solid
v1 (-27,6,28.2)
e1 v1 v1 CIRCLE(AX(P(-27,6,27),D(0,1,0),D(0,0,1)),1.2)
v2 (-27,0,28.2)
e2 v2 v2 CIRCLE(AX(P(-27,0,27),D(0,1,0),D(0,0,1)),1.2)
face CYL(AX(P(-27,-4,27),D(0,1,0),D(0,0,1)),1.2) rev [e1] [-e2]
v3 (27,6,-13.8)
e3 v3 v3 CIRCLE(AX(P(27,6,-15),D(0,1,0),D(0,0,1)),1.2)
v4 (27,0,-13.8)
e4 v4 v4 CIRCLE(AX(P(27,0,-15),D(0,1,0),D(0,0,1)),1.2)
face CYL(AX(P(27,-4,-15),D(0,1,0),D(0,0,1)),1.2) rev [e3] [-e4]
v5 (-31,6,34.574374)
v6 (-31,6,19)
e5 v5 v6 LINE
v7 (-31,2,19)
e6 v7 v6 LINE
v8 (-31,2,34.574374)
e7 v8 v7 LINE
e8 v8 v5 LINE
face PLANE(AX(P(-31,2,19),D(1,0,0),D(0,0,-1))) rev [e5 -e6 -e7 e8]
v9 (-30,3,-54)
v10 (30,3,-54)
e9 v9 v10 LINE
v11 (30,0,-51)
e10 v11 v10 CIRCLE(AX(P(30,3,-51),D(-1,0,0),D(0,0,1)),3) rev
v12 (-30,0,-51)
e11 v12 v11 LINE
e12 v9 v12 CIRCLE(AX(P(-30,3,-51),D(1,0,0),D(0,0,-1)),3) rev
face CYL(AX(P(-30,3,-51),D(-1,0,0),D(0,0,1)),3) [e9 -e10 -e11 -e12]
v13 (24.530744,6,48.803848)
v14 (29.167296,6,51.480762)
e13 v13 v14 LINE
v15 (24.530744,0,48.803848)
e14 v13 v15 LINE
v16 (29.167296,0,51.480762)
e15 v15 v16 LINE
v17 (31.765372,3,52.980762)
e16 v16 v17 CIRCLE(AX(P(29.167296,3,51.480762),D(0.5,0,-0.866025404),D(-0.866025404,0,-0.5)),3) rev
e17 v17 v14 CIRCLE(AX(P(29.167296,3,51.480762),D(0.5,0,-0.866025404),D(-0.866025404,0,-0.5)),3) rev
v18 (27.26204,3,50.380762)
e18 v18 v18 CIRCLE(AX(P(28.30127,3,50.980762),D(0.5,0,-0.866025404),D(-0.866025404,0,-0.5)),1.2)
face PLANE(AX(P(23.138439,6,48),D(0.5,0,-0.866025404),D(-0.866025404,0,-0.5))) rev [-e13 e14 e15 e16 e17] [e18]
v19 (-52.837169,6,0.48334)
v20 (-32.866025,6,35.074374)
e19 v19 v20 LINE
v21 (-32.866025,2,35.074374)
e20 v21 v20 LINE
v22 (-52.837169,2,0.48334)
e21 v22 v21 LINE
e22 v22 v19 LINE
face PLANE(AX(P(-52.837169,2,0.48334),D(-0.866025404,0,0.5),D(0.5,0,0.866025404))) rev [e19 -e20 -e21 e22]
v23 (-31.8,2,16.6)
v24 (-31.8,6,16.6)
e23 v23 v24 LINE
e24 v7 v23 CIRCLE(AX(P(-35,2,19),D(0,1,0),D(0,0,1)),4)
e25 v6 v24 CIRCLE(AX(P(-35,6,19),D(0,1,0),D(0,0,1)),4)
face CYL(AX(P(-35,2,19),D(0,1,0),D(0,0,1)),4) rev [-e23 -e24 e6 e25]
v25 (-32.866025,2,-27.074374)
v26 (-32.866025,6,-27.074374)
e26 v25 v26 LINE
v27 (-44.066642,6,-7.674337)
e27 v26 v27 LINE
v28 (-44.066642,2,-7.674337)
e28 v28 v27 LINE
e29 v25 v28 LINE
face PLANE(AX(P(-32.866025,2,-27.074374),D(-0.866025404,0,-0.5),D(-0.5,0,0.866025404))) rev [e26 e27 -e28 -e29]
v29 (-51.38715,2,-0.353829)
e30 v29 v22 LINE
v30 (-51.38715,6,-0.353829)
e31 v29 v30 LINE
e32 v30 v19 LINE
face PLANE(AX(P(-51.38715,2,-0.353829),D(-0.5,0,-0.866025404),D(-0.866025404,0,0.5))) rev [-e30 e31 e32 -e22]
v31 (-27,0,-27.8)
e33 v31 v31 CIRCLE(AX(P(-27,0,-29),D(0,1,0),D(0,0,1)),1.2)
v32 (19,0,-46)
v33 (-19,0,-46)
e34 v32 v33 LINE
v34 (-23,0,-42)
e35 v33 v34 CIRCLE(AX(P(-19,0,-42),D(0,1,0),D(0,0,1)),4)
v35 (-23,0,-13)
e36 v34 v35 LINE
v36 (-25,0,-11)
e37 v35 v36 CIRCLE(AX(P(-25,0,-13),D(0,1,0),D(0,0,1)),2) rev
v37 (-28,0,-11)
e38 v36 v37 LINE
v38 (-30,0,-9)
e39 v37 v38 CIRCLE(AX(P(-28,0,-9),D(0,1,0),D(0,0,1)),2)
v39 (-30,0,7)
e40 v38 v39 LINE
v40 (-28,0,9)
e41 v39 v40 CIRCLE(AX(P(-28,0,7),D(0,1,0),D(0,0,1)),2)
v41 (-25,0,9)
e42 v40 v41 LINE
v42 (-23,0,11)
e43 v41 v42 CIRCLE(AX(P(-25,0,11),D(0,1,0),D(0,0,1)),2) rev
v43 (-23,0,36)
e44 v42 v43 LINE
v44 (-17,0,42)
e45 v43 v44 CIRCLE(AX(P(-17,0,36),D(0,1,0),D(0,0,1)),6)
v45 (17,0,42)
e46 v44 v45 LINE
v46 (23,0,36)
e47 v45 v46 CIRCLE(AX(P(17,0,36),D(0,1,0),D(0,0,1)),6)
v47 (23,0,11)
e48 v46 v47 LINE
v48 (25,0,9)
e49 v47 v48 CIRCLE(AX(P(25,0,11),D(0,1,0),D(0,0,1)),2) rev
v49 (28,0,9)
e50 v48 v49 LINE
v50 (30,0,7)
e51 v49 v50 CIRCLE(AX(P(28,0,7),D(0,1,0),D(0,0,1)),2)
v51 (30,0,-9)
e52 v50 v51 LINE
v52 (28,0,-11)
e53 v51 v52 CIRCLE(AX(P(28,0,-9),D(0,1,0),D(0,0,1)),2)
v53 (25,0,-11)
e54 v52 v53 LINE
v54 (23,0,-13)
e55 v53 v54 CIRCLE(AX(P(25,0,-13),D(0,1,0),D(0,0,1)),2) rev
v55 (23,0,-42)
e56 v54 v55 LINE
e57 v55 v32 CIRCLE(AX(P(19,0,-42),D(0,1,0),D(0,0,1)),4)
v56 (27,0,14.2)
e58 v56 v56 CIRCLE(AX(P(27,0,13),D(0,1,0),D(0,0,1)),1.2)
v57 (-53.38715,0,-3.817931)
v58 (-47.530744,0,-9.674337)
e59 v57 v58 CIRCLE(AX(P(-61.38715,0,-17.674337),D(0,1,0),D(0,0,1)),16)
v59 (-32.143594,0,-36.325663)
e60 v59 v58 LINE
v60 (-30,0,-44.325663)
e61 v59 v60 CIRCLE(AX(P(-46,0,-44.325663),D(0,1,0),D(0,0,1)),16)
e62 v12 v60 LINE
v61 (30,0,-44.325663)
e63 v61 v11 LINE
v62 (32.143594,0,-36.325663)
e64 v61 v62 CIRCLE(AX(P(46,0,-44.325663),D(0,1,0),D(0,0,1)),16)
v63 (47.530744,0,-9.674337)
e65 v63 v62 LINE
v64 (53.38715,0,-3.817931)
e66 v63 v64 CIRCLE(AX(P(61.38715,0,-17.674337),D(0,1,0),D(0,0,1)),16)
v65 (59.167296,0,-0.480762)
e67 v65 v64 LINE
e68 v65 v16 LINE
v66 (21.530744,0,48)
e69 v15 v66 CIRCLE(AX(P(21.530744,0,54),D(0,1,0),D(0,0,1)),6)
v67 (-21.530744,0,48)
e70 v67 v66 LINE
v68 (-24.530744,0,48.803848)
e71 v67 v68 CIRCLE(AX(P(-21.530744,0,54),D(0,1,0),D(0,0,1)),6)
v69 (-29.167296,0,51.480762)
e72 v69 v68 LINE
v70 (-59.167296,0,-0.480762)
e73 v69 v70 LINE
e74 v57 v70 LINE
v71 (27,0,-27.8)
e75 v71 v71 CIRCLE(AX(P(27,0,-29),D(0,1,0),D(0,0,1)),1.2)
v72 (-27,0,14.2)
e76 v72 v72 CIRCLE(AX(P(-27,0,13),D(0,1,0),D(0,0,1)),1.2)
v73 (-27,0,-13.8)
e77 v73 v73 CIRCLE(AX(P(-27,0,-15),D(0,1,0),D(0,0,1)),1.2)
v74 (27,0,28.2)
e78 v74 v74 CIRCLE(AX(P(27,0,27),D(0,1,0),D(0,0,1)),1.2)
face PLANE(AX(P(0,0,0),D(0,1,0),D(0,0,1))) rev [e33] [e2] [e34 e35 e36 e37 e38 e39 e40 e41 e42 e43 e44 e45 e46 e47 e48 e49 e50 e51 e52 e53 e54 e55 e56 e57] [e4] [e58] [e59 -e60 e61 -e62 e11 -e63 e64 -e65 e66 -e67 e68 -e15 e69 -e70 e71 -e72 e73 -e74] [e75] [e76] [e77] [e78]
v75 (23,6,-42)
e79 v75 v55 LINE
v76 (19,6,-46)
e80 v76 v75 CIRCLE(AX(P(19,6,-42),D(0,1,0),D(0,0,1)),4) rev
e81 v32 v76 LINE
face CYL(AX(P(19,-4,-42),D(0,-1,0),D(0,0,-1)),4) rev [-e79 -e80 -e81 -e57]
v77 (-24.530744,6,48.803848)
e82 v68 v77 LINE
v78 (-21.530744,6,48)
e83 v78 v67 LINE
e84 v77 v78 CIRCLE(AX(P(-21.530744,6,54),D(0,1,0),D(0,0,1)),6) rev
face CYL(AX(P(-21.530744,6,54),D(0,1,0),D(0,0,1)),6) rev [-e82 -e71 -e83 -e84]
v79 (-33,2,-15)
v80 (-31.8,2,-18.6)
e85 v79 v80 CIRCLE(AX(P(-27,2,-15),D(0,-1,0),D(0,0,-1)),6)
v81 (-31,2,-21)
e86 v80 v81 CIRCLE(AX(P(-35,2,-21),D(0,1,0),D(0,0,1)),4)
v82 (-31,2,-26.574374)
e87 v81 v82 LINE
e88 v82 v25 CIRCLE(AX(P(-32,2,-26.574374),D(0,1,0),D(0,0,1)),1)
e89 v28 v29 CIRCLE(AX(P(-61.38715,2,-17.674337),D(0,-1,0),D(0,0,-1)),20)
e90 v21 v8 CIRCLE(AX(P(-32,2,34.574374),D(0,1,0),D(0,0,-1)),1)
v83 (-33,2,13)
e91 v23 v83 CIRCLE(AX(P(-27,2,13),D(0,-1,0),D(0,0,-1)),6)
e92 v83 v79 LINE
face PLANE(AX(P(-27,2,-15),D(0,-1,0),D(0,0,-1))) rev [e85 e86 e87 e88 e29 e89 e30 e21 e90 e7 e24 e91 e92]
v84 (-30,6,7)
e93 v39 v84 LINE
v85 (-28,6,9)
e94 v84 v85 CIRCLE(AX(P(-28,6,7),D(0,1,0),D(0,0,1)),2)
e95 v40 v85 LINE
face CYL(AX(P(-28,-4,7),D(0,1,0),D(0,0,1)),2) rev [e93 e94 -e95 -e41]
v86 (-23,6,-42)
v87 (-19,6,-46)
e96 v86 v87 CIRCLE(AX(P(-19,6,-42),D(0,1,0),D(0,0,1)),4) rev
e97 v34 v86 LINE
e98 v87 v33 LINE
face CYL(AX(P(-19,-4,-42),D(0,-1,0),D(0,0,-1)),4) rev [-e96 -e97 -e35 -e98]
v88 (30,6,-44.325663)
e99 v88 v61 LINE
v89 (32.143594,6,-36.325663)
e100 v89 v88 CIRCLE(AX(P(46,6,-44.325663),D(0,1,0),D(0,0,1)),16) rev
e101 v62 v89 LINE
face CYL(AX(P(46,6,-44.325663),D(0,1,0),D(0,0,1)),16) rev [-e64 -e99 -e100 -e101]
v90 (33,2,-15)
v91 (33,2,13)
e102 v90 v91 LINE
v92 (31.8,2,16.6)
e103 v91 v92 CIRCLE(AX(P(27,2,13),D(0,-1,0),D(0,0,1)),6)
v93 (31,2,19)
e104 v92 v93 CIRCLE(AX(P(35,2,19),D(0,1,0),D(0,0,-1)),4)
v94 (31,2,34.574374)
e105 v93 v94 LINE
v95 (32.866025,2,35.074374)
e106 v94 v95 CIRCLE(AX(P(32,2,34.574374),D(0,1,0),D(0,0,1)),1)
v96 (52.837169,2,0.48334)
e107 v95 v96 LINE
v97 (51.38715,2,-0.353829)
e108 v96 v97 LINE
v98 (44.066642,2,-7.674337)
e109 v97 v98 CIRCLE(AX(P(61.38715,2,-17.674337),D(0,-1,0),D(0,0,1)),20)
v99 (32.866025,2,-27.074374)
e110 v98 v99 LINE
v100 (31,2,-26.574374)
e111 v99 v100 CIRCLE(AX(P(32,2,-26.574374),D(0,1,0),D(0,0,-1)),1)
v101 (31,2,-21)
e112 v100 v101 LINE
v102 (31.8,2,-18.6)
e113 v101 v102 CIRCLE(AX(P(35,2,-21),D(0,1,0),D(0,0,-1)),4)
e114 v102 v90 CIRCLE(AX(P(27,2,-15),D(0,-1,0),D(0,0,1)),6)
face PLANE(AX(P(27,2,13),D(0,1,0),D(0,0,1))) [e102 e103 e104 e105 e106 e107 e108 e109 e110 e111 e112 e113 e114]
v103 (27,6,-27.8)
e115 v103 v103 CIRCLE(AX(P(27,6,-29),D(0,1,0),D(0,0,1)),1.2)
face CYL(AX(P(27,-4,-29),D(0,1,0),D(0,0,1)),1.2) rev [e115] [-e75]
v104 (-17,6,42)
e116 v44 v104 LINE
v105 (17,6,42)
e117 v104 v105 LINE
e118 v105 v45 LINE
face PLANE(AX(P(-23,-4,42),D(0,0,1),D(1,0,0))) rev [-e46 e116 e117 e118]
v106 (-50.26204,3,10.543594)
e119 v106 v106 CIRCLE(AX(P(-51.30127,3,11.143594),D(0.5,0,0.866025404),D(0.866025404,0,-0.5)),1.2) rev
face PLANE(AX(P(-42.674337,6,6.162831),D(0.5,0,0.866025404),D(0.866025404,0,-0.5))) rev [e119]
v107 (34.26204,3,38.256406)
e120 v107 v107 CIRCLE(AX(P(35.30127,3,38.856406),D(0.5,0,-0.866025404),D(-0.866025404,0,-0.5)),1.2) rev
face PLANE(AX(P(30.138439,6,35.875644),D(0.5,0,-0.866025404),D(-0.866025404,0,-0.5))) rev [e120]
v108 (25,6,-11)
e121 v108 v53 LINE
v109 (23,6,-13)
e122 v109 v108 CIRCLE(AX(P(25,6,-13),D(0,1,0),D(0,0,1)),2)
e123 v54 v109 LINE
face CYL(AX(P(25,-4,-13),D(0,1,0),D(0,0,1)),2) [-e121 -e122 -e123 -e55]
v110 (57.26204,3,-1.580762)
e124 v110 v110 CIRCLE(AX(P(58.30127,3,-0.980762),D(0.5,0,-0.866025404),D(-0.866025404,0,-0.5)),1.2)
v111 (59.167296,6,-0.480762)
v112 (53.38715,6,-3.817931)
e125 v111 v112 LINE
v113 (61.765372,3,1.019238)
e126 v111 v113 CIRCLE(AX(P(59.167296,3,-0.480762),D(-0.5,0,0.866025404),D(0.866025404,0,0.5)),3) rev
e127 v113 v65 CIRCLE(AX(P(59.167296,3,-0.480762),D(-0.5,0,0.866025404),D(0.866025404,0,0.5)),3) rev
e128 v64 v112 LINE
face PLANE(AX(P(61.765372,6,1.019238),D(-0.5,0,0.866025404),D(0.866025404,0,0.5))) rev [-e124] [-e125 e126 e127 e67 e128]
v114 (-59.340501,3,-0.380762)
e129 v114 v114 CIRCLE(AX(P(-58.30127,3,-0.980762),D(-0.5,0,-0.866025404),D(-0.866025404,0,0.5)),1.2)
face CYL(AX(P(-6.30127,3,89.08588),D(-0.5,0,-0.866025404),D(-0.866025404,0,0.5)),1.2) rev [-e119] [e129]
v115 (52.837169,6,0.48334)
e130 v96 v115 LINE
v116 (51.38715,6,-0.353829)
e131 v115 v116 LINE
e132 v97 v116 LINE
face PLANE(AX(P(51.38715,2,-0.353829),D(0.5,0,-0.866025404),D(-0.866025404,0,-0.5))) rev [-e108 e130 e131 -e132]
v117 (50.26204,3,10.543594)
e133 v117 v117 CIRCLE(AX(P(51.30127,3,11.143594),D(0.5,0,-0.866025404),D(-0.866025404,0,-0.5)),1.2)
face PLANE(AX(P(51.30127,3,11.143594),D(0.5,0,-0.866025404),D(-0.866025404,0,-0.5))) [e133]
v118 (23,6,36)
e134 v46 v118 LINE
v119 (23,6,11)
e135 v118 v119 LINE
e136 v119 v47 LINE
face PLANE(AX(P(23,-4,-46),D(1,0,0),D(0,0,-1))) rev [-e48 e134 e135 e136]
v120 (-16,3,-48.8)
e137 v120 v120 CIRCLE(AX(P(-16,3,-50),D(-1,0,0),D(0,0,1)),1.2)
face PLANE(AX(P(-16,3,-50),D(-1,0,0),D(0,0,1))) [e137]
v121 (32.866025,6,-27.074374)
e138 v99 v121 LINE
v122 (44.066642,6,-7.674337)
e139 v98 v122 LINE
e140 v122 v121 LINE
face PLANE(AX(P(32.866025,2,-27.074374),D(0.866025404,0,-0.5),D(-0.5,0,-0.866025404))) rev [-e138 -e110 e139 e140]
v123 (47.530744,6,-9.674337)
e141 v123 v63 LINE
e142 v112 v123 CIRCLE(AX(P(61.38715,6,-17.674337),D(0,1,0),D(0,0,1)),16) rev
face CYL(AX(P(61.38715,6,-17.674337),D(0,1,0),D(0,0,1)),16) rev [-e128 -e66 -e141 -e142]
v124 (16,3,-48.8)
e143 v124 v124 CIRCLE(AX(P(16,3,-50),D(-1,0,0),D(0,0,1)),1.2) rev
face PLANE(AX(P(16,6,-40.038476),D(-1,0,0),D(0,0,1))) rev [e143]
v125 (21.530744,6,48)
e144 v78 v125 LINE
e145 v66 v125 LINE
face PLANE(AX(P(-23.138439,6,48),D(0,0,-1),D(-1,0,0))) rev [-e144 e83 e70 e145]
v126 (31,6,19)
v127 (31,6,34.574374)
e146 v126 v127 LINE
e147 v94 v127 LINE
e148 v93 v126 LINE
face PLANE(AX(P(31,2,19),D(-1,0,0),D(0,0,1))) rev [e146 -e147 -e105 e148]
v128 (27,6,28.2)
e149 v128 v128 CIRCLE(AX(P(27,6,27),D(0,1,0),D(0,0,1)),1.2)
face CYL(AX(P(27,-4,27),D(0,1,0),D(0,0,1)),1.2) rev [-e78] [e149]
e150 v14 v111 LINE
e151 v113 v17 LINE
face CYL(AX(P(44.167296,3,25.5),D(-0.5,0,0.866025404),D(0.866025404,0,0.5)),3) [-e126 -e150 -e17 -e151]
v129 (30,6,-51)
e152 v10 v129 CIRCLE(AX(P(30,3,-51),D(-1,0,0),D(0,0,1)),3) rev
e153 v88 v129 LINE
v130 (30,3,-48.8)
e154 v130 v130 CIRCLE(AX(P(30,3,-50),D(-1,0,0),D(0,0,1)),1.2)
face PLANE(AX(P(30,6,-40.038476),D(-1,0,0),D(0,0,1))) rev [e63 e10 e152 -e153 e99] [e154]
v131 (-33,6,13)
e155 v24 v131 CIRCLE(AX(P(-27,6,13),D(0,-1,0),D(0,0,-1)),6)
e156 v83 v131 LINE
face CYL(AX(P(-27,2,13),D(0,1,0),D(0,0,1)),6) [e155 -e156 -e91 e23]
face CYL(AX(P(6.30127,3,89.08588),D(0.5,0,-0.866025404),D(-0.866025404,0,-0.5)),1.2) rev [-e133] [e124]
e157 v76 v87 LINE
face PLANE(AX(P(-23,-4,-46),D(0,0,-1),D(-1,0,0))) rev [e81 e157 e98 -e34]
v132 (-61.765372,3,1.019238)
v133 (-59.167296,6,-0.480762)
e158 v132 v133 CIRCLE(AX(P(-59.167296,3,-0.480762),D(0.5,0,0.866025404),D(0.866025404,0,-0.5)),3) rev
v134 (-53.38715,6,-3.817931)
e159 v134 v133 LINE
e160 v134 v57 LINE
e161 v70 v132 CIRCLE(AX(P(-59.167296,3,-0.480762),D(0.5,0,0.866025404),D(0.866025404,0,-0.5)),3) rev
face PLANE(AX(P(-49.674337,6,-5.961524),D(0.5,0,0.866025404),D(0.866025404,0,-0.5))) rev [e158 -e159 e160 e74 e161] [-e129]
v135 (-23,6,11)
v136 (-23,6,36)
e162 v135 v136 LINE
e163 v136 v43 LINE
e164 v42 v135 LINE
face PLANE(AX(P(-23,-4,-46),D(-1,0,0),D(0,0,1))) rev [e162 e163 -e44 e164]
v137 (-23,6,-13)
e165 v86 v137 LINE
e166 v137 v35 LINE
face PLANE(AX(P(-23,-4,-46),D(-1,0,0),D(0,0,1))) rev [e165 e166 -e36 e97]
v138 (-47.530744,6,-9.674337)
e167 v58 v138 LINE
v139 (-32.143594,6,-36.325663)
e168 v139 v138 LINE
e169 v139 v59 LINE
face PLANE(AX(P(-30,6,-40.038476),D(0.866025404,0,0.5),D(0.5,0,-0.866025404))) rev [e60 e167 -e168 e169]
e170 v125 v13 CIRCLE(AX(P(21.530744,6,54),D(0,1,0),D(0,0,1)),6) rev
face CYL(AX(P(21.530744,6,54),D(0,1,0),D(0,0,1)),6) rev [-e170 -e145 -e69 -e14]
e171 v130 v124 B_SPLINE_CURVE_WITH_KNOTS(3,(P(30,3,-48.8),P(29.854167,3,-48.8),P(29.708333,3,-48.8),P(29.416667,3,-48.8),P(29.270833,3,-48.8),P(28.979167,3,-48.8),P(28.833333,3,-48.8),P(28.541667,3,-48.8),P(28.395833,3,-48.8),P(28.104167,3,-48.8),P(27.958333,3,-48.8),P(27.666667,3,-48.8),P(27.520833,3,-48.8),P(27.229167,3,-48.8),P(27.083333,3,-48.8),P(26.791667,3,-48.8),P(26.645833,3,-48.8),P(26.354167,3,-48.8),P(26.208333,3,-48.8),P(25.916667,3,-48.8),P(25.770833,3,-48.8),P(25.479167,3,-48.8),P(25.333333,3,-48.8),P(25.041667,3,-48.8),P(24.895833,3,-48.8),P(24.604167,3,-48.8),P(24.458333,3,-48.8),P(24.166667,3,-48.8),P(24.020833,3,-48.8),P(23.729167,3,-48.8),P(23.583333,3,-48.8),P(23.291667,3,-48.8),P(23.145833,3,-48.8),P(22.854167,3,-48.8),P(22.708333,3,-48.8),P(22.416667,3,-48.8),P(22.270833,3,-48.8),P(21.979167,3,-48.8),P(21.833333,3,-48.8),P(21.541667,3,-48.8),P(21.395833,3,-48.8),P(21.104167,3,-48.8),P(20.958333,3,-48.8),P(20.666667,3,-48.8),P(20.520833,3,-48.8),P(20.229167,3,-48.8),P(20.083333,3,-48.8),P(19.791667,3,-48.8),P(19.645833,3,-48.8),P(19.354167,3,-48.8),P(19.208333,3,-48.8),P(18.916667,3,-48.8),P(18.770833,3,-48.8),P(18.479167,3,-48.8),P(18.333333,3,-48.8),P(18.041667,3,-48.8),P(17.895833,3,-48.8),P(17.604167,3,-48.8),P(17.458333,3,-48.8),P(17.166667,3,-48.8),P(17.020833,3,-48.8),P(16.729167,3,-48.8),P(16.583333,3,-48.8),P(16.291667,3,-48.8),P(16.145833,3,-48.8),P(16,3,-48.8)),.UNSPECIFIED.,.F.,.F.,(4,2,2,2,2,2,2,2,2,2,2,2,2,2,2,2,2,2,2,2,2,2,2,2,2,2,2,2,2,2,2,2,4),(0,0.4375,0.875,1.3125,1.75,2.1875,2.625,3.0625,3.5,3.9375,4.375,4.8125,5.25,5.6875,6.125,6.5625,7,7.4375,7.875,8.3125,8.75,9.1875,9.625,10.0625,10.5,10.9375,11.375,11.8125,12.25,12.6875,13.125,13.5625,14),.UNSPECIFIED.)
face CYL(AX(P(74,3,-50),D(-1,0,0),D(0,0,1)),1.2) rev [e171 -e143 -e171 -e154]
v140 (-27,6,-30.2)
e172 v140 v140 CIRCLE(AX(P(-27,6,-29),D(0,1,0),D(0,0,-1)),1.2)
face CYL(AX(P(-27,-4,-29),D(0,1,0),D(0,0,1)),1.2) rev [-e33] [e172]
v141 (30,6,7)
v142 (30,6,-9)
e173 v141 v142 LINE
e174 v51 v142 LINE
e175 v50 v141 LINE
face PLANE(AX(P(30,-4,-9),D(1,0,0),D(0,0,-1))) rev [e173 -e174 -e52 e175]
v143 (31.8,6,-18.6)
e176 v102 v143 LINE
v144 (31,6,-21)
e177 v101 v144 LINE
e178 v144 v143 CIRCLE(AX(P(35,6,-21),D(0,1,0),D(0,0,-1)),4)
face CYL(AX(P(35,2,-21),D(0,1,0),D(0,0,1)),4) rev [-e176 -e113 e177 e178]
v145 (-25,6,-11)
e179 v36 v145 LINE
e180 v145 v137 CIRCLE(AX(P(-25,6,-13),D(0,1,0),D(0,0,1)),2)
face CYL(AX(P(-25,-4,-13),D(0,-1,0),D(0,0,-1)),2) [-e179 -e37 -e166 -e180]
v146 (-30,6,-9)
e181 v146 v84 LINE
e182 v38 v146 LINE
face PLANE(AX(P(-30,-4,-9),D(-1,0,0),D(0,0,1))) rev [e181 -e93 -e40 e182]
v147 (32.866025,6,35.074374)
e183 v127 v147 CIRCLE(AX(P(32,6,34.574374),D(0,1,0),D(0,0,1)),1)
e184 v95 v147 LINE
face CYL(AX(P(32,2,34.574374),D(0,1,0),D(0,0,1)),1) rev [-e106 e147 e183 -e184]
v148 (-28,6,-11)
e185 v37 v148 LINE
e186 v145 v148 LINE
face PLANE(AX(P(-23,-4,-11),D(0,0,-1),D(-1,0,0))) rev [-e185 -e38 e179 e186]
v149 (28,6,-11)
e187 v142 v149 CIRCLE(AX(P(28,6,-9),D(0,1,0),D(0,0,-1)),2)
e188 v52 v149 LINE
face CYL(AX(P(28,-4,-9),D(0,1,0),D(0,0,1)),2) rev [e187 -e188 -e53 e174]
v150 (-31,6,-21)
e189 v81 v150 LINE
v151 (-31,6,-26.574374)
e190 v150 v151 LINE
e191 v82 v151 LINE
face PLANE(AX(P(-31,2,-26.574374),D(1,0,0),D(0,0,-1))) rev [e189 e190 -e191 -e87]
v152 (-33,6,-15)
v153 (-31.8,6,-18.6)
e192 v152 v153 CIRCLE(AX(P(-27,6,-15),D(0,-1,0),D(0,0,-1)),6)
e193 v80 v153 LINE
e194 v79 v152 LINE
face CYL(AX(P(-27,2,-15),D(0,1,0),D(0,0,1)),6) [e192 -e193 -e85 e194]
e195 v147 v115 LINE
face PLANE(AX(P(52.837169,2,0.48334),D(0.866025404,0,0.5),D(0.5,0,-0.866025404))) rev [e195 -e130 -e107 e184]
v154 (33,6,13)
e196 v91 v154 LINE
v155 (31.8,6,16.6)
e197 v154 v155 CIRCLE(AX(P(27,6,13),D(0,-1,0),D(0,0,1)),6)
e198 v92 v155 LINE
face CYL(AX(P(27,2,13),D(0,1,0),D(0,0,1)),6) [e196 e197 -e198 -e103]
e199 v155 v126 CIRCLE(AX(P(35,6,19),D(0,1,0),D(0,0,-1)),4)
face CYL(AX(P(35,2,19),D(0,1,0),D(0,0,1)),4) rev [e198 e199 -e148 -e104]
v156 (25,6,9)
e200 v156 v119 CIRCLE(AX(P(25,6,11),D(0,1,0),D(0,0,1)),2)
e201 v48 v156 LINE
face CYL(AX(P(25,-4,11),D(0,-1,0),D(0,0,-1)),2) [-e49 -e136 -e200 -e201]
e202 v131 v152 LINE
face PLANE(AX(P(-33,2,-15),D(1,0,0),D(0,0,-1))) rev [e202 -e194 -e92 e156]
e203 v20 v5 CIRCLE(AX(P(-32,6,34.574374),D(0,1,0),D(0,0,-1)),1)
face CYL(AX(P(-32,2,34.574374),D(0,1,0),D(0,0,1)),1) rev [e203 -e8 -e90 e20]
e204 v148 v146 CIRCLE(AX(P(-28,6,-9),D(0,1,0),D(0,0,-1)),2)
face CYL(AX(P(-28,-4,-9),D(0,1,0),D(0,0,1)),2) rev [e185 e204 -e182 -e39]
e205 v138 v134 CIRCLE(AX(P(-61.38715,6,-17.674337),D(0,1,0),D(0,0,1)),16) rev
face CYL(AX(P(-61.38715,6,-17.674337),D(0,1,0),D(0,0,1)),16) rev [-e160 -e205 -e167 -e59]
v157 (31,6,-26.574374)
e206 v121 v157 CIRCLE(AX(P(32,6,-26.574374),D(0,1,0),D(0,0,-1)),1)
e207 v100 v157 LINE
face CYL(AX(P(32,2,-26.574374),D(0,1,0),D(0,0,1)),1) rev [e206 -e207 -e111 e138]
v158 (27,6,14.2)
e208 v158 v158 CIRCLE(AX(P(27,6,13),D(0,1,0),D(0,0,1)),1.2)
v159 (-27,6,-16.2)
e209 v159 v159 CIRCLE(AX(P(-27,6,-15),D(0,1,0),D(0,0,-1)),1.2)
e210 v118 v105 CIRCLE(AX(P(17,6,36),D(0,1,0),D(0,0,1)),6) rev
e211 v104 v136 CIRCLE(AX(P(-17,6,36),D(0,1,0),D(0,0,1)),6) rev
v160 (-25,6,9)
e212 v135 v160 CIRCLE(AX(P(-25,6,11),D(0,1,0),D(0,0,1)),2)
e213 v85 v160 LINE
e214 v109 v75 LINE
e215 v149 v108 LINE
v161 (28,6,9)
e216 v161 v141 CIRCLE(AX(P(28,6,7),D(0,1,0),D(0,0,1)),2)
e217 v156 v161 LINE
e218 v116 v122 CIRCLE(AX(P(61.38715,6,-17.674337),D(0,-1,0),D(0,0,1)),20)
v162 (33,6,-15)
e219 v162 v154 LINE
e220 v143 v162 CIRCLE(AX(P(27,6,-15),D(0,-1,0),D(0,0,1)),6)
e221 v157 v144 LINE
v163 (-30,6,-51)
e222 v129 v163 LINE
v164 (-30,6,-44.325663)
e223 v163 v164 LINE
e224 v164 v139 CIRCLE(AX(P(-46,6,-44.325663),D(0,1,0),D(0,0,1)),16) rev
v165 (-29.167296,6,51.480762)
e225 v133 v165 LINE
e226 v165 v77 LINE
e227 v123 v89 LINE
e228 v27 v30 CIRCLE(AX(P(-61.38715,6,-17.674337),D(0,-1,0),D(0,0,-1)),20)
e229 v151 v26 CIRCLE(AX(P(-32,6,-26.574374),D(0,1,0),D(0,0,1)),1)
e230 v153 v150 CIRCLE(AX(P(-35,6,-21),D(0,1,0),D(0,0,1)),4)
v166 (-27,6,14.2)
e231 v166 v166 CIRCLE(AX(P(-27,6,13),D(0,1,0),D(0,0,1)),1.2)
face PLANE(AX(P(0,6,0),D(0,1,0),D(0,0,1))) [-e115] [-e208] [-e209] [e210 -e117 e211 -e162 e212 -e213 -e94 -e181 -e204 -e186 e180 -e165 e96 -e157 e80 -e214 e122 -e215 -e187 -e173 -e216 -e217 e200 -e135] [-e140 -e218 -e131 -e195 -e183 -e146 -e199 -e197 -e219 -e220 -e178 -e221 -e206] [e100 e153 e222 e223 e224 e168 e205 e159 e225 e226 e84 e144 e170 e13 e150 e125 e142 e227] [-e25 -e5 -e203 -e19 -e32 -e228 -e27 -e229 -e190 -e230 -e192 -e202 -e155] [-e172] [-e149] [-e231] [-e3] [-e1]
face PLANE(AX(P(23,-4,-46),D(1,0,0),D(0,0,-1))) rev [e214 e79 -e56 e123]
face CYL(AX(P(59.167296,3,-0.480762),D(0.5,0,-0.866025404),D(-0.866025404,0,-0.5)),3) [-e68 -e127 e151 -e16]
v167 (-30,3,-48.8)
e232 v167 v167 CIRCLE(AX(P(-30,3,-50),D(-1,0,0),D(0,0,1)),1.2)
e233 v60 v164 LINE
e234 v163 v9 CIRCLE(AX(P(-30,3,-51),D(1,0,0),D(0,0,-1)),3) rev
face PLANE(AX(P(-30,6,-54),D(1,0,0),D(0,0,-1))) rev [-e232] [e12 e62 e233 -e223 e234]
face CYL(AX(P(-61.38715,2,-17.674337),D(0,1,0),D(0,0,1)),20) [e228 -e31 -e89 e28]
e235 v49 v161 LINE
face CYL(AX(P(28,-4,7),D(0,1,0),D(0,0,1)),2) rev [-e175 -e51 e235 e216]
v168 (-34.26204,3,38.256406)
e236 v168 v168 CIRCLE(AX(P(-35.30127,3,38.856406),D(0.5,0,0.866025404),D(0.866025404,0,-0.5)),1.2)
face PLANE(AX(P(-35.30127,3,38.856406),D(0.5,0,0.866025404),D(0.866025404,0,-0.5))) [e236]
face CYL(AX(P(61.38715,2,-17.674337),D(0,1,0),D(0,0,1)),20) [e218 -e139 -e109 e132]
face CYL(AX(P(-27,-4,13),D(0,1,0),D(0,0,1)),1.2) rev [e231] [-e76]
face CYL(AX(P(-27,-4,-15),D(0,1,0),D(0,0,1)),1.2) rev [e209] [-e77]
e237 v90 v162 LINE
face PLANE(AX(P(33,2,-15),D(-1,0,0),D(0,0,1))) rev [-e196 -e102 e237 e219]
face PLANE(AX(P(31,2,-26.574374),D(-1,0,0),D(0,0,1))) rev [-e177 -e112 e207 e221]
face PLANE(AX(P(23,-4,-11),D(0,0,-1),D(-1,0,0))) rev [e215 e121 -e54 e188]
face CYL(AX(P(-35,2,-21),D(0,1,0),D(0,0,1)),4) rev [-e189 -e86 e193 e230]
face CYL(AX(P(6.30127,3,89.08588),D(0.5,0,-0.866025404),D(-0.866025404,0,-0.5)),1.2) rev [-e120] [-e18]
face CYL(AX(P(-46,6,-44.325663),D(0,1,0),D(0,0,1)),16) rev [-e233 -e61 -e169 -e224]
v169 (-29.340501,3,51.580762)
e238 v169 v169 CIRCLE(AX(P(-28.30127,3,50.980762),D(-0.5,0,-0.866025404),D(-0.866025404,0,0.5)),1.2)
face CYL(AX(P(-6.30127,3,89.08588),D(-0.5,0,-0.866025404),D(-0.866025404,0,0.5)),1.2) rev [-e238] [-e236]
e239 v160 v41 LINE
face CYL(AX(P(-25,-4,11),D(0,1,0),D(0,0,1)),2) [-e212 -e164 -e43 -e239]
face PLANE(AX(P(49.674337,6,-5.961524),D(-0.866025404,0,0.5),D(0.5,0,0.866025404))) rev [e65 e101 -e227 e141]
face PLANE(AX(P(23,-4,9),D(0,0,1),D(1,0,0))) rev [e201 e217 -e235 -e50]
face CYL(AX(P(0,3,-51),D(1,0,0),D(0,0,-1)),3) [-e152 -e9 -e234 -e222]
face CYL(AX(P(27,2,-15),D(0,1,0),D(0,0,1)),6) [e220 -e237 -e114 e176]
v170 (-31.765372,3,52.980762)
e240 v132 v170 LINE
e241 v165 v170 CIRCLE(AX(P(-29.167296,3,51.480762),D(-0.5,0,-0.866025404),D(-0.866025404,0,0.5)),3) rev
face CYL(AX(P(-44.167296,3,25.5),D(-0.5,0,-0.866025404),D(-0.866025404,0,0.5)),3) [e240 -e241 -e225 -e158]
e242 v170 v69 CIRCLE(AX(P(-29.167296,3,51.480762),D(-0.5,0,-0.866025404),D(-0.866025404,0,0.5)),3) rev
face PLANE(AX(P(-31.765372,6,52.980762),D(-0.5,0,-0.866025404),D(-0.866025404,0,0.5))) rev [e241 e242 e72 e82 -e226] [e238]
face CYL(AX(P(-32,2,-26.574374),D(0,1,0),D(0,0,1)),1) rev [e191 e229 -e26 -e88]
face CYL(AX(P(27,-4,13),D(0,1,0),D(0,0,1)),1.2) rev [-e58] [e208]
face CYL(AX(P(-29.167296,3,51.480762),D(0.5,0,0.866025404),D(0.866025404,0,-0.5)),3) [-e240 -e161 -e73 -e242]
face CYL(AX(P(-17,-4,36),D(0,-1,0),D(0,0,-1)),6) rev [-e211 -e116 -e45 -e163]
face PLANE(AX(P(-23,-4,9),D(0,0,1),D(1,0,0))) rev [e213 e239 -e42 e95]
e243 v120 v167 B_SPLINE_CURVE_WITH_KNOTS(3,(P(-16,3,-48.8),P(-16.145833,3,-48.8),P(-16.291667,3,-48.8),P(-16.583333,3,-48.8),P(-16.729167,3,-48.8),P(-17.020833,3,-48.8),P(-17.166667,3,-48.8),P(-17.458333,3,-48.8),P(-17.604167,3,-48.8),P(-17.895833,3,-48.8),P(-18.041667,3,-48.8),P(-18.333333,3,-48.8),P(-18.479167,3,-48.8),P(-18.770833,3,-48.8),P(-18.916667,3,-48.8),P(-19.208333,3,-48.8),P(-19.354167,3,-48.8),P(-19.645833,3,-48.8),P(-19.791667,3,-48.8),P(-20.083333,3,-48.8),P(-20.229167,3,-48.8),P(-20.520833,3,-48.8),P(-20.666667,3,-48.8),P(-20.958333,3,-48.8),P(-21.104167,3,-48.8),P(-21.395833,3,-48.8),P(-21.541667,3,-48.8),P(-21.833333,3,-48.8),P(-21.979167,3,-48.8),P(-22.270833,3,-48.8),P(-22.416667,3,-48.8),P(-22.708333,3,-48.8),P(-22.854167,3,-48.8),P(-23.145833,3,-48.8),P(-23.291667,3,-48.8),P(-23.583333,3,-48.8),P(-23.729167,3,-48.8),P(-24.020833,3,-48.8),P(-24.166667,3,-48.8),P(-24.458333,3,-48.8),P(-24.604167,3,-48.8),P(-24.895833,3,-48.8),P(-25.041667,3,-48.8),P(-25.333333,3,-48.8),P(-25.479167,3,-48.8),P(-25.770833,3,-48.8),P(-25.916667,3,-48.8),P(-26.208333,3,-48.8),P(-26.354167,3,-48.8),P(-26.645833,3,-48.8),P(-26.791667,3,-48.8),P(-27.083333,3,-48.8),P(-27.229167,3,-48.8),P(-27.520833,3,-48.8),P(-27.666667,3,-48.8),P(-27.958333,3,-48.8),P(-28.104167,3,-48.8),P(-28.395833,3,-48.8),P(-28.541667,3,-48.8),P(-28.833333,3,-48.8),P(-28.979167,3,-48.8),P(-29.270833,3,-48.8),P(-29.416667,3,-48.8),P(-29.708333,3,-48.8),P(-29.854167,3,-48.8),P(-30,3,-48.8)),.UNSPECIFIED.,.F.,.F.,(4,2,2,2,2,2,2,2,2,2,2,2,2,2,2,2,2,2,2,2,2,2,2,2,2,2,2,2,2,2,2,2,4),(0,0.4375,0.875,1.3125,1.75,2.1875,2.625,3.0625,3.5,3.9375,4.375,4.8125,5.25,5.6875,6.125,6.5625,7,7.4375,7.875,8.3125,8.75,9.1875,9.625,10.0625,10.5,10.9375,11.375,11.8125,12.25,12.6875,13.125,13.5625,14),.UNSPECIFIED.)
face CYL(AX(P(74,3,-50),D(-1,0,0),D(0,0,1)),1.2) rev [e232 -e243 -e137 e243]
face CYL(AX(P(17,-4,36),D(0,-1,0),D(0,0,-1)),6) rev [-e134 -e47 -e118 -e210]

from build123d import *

# Parameters (mm, degrees)
BOSS_EXTRUDE1_DEPTH = 6
SKETCH6_R           = 1.2
CUT_EXTRUDE1_DEPTH  = 104
SKETCH4_R           = 1.2
CUT_EXTRUDE2_DEPTH  = 104
SKETCH2_R           = 1.2
CUT_EXTRUDE3_DEPTH  = 104
FILLET2_R           = 3
SKETCH11_R          = 1.2
BOSS_EXTRUDE3_DEPTH = 32
SKETCH13_R          = 1.2
BOSS_EXTRUDE4_DEPTH = 32
BOSS_EXTRUDE5_START = -32
SKETCH14_R          = 1.2
BOSS_EXTRUDE5_DEPTH = 32
SKETCH16_W          = 46
SKETCH16_H          = 88
CUT_EXTRUDE5_DEPTH  = 10
SKETCH15_R          = 1.2
CUT_EXTRUDE4_DEPTH  = 10
FILLET3_R           = 6
FILLET1_R           = 16
FILLET4_R           = 6
FILLET5_R           = 4
CUT_EXTRUDE6_DEPTH  = 10
FILLET6_R           = 2
SKETCH18_R          = 1.2
CUT_EXTRUDE7_DEPTH  = 10
CUT_EXTRUDE8_DEPTH  = 4


with BuildPart() as part:
    # Sketch1 → Boss-Extrude1 (new body)
    with BuildSketch(Plane(origin=(0, 0, 0), x_dir=(1, 0, 0), z_dir=(0, 1, 0))):
        Polygon((-30, 54), (30, 54), (30, 40.038475773), (49.674337148, 5.961524227), (61.765371804, -1.019237886), (31.765371804, -52.980762114), (23.138438763, -48), (-23.138438763, -48), (-31.765371804, -52.980762114), (-61.765371804, -1.019237886), (-49.674337148, 5.961524227), (-30, 40.038475773), align=None)
    extrude(amount=BOSS_EXTRUDE1_DEPTH)

    # Sketch6 → Cut-Extrude1 (cut)
    with BuildSketch(Plane(origin=(15, 0, -25.980762114), x_dir=(-0.8660254037844389, 0, -0.4999999999999996), z_dir=(0.4999999999999996, 0, -0.8660254037844389))):
        with Locations((-50, 3)):
            Circle(SKETCH6_R)
    extrude(amount=-CUT_EXTRUDE1_DEPTH, mode=Mode.SUBTRACT)

    # Sketch4 → Cut-Extrude2 (cut)
    with BuildSketch(Plane(origin=(-15, 0, -25.980762114), x_dir=(-0.8660254037844386, 0, 0.5), z_dir=(-0.5000000000000001, 0, -0.8660254037844387))):
        with Locations((50, 3)):
            Circle(SKETCH4_R)
    extrude(amount=-CUT_EXTRUDE2_DEPTH, mode=Mode.SUBTRACT)

    # Sketch2 → Cut-Extrude3 (cut)
    with BuildSketch(Plane.ZY.offset(30)):
        with Locations((-50, 3)):
            Circle(SKETCH2_R)
    extrude(amount=-CUT_EXTRUDE3_DEPTH, mode=Mode.SUBTRACT)

    # Fillet2
    fillet2_edges = [part.edges().sort_by_distance(p)[0] for p in [
        (46.765371804, 0, 27),
        (46.765371804, 6, 27),
        (-46.765371804, 6, 27),
        (-46.765371804, 0, 27),
        (0, 0, -54),
        (0, 6, -54),
    ]]
    fillet(fillet2_edges, radius=FILLET2_R - 0.0001)  # a hair under: the kernel refuses the full size

    # Sketch11 → Boss-Extrude3 (add)
    with BuildSketch(Plane.ZY.offset(16)):
        with Locations((-50, 3)):
            Circle(SKETCH11_R)
    extrude(amount=-BOSS_EXTRUDE3_DEPTH)

    # Sketch13 → Boss-Extrude4 (add)
    with BuildSketch(Plane(origin=(8, 0, -13.856406461), x_dir=(-0.8660254037844386, 0, -0.4999999999999999), z_dir=(0.49999999999999994, 0, -0.8660254037844387))):
        with Locations((-50, 3)):
            Circle(SKETCH13_R)
    extrude(amount=-BOSS_EXTRUDE4_DEPTH)

    # Sketch14 → Boss-Extrude5 (add)
    with BuildSketch(Plane(origin=(8, 0, 13.856406461), x_dir=(0.8660254037844386, 0, -0.4999999999999999), z_dir=(0.49999999999999994, 0, 0.8660254037844387)).offset(BOSS_EXTRUDE5_START)):
        with Locations(Location((-50, 3, 0), (0, 0, 180))):
            Circle(SKETCH14_R)
    extrude(amount=BOSS_EXTRUDE5_DEPTH)

    # Sketch16 → Cut-Extrude5 (cut)
    with BuildSketch(Plane(origin=(0, 6, 0), x_dir=(1, 0, 0), z_dir=(0, 1, 0))):
        with Locations((0, 2)):
            Rectangle(SKETCH16_W, SKETCH16_H)
    extrude(amount=-CUT_EXTRUDE5_DEPTH, mode=Mode.SUBTRACT)

    # Sketch15 → Cut-Extrude4 (cut)
    with BuildSketch(Plane(origin=(0, 6, 0), x_dir=(1, 0, 0), z_dir=(0, 1, 0))):
        with Locations(Location((27, 29, 0), (0, 0, 270))):
            Circle(SKETCH15_R)
        with Locations(Location((-27, 15, 0), (0, 0, 270))):
            Circle(SKETCH15_R)
        with Locations(Location((-27, 29, 0), (0, 0, 270))):
            Circle(SKETCH15_R)
        with Locations(Location((27, 15, 0), (0, 0, 270))):
            Circle(SKETCH15_R)
    extrude(amount=-CUT_EXTRUDE4_DEPTH, mode=Mode.SUBTRACT)

    # Fillet3
    fillet3_edges = [part.edges().sort_by_distance(p)[0] for p in [
        (-23, 3, 42),
        (23, 3, 42),
    ]]
    fillet(fillet3_edges, radius=FILLET3_R)

    # Fillet1
    fillet1_edges = [part.edges().sort_by_distance(p)[0] for p in [
        (30, 3, -40.038475773),
        (49.674337148, 3, -5.961524227),
        (-49.674337148, 3, -5.961524227),
        (-30, 3, -40.038475773),
    ]]
    fillet(fillet1_edges, radius=FILLET1_R)

    # Fillet4
    fillet4_edges = [part.edges().sort_by_distance(p)[0] for p in [
        (23.138438763, 3, 48),
        (-23.138438763, 3, 48),
    ]]
    fillet(fillet4_edges, radius=FILLET4_R)

    # Fillet5
    fillet5_edges = [part.edges().sort_by_distance(p)[0] for p in [
        (-23, 3, -46),
        (23, 3, -46),
    ]]
    fillet(fillet5_edges, radius=FILLET5_R)

    # Sketch17 → Cut-Extrude6 (cut)
    with BuildSketch(Plane(origin=(0, 6, 0), x_dir=(1, 0, 0), z_dir=(0, 1, 0))):
        with BuildLine():
            Line((23, 11), (28, 11))
            ThreePointArc((28, 11), (29.414213562, 10.414213562), (30, 9))
            Line((30, 9), (30, -7))
            ThreePointArc((30, -7), (29.414213562, -8.414213562), (28, -9))
            Line((28, -9), (23, -9))
            Line((23, -9), (23, 11))
        make_face()
        with BuildLine():
            Line((-30, 9), (-30, -7))
            ThreePointArc((-30, -7), (-29.414213562, -8.414213562), (-28, -9))
            Line((-28, -9), (-23, -9))
            Line((-23, -9), (-23, 11))
            Line((-23, 11), (-28, 11))
            ThreePointArc((-28, 11), (-29.414213562, 10.414213562), (-30, 9))
        make_face()
    extrude(amount=-CUT_EXTRUDE6_DEPTH, mode=Mode.SUBTRACT)

    # Fillet6
    fillet6_edges = [part.edges().sort_by_distance(p)[0] for p in [
        (23, 3, 9),
        (23, 3, -11),
        (-23, 3, -11),
        (-23, 3, 9),
    ]]
    fillet(fillet6_edges, radius=FILLET6_R)

    # Sketch18 → Cut-Extrude7 (cut)
    with BuildSketch(Plane(origin=(0, 6, 0), x_dir=(1, 0, 0), z_dir=(0, 1, 0))):
        with Locations(Location((27, -13, 0), (0, 0, 270))):
            Circle(SKETCH18_R)
        with Locations(Location((27, -27, 0), (0, 0, 270))):
            Circle(SKETCH18_R)
        with Locations(Location((-27, -13, 0), (0, 0, 270))):
            Circle(SKETCH18_R)
        with Locations(Location((-27, -27, 0), (0, 0, 270))):
            Circle(SKETCH18_R)
    extrude(amount=-CUT_EXTRUDE7_DEPTH, mode=Mode.SUBTRACT)

    # Sketch19 → Cut-Extrude8 (cut)
    with BuildSketch(Plane(origin=(0, 6, 0), x_dir=(1, 0, 0), z_dir=(0, 1, 0))):
        with BuildLine():
            Line((31, 26.574374158), (31, 21))
            ThreePointArc((31, 21), (31.205266808, 19.735088936), (31.8, 18.6))
            ThreePointArc((31.8, 18.6), (32.692099788, 16.897366596), (33, 15))
            Line((33, 15), (33, -13))
            ThreePointArc((33, -13), (32.692099788, -14.897366596), (31.8, -16.6))
            ThreePointArc((31.8, -16.6), (31.205266808, -17.735088936), (31, -19))
            Line((31, -19), (31, -34.574374158))
            ThreePointArc((31, -34.574374158), (31.741180955, -35.540299984), (32.866025404, -35.074374158))
            Line((32.866025404, -35.074374158), (52.837168574, -0.483339502))
            Line((52.837168574, -0.483339502), (51.387150069, 0.353829072))
            ThreePointArc((51.387150069, 0.353829072), (47.245014446, 3.532201524), (44.066641994, 7.674337148))
            Line((44.066641994, 7.674337148), (32.866025404, 27.074374158))
            ThreePointArc((32.866025404, 27.074374158), (31.741180955, 27.540299984), (31, 26.574374158))
        make_face()
        with BuildLine():
            Line((-52.837168574, -0.483339502), (-32.866025404, -35.074374158))
            ThreePointArc((-32.866025404, -35.074374158), (-31.741180955, -35.540299984), (-31, -34.574374158))
            Line((-31, -34.574374158), (-31, -19))
            ThreePointArc((-31, -19), (-31.205266808, -17.735088936), (-31.8, -16.6))
            ThreePointArc((-31.8, -16.6), (-32.692099788, -14.897366596), (-33, -13))
            Line((-33, -13), (-33, 15))
            ThreePointArc((-33, 15), (-32.692099788, 16.897366596), (-31.8, 18.6))
            ThreePointArc((-31.8, 18.6), (-31.205266808, 19.735088936), (-31, 21))
            Line((-31, 21), (-31, 26.574374158))
            ThreePointArc((-31, 26.574374158), (-31.741180955, 27.540299984), (-32.866025404, 27.074374158))
            Line((-32.866025404, 27.074374158), (-44.066641994, 7.674337148))
            ThreePointArc((-44.066641994, 7.674337148), (-47.245014446, 3.532201524), (-51.387150069, 0.353829072))
            Line((-51.387150069, 0.353829072), (-52.837168574, -0.483339502))
        make_face()
    extrude(amount=-CUT_EXTRUDE8_DEPTH, mode=Mode.SUBTRACT)


solid = part.part
